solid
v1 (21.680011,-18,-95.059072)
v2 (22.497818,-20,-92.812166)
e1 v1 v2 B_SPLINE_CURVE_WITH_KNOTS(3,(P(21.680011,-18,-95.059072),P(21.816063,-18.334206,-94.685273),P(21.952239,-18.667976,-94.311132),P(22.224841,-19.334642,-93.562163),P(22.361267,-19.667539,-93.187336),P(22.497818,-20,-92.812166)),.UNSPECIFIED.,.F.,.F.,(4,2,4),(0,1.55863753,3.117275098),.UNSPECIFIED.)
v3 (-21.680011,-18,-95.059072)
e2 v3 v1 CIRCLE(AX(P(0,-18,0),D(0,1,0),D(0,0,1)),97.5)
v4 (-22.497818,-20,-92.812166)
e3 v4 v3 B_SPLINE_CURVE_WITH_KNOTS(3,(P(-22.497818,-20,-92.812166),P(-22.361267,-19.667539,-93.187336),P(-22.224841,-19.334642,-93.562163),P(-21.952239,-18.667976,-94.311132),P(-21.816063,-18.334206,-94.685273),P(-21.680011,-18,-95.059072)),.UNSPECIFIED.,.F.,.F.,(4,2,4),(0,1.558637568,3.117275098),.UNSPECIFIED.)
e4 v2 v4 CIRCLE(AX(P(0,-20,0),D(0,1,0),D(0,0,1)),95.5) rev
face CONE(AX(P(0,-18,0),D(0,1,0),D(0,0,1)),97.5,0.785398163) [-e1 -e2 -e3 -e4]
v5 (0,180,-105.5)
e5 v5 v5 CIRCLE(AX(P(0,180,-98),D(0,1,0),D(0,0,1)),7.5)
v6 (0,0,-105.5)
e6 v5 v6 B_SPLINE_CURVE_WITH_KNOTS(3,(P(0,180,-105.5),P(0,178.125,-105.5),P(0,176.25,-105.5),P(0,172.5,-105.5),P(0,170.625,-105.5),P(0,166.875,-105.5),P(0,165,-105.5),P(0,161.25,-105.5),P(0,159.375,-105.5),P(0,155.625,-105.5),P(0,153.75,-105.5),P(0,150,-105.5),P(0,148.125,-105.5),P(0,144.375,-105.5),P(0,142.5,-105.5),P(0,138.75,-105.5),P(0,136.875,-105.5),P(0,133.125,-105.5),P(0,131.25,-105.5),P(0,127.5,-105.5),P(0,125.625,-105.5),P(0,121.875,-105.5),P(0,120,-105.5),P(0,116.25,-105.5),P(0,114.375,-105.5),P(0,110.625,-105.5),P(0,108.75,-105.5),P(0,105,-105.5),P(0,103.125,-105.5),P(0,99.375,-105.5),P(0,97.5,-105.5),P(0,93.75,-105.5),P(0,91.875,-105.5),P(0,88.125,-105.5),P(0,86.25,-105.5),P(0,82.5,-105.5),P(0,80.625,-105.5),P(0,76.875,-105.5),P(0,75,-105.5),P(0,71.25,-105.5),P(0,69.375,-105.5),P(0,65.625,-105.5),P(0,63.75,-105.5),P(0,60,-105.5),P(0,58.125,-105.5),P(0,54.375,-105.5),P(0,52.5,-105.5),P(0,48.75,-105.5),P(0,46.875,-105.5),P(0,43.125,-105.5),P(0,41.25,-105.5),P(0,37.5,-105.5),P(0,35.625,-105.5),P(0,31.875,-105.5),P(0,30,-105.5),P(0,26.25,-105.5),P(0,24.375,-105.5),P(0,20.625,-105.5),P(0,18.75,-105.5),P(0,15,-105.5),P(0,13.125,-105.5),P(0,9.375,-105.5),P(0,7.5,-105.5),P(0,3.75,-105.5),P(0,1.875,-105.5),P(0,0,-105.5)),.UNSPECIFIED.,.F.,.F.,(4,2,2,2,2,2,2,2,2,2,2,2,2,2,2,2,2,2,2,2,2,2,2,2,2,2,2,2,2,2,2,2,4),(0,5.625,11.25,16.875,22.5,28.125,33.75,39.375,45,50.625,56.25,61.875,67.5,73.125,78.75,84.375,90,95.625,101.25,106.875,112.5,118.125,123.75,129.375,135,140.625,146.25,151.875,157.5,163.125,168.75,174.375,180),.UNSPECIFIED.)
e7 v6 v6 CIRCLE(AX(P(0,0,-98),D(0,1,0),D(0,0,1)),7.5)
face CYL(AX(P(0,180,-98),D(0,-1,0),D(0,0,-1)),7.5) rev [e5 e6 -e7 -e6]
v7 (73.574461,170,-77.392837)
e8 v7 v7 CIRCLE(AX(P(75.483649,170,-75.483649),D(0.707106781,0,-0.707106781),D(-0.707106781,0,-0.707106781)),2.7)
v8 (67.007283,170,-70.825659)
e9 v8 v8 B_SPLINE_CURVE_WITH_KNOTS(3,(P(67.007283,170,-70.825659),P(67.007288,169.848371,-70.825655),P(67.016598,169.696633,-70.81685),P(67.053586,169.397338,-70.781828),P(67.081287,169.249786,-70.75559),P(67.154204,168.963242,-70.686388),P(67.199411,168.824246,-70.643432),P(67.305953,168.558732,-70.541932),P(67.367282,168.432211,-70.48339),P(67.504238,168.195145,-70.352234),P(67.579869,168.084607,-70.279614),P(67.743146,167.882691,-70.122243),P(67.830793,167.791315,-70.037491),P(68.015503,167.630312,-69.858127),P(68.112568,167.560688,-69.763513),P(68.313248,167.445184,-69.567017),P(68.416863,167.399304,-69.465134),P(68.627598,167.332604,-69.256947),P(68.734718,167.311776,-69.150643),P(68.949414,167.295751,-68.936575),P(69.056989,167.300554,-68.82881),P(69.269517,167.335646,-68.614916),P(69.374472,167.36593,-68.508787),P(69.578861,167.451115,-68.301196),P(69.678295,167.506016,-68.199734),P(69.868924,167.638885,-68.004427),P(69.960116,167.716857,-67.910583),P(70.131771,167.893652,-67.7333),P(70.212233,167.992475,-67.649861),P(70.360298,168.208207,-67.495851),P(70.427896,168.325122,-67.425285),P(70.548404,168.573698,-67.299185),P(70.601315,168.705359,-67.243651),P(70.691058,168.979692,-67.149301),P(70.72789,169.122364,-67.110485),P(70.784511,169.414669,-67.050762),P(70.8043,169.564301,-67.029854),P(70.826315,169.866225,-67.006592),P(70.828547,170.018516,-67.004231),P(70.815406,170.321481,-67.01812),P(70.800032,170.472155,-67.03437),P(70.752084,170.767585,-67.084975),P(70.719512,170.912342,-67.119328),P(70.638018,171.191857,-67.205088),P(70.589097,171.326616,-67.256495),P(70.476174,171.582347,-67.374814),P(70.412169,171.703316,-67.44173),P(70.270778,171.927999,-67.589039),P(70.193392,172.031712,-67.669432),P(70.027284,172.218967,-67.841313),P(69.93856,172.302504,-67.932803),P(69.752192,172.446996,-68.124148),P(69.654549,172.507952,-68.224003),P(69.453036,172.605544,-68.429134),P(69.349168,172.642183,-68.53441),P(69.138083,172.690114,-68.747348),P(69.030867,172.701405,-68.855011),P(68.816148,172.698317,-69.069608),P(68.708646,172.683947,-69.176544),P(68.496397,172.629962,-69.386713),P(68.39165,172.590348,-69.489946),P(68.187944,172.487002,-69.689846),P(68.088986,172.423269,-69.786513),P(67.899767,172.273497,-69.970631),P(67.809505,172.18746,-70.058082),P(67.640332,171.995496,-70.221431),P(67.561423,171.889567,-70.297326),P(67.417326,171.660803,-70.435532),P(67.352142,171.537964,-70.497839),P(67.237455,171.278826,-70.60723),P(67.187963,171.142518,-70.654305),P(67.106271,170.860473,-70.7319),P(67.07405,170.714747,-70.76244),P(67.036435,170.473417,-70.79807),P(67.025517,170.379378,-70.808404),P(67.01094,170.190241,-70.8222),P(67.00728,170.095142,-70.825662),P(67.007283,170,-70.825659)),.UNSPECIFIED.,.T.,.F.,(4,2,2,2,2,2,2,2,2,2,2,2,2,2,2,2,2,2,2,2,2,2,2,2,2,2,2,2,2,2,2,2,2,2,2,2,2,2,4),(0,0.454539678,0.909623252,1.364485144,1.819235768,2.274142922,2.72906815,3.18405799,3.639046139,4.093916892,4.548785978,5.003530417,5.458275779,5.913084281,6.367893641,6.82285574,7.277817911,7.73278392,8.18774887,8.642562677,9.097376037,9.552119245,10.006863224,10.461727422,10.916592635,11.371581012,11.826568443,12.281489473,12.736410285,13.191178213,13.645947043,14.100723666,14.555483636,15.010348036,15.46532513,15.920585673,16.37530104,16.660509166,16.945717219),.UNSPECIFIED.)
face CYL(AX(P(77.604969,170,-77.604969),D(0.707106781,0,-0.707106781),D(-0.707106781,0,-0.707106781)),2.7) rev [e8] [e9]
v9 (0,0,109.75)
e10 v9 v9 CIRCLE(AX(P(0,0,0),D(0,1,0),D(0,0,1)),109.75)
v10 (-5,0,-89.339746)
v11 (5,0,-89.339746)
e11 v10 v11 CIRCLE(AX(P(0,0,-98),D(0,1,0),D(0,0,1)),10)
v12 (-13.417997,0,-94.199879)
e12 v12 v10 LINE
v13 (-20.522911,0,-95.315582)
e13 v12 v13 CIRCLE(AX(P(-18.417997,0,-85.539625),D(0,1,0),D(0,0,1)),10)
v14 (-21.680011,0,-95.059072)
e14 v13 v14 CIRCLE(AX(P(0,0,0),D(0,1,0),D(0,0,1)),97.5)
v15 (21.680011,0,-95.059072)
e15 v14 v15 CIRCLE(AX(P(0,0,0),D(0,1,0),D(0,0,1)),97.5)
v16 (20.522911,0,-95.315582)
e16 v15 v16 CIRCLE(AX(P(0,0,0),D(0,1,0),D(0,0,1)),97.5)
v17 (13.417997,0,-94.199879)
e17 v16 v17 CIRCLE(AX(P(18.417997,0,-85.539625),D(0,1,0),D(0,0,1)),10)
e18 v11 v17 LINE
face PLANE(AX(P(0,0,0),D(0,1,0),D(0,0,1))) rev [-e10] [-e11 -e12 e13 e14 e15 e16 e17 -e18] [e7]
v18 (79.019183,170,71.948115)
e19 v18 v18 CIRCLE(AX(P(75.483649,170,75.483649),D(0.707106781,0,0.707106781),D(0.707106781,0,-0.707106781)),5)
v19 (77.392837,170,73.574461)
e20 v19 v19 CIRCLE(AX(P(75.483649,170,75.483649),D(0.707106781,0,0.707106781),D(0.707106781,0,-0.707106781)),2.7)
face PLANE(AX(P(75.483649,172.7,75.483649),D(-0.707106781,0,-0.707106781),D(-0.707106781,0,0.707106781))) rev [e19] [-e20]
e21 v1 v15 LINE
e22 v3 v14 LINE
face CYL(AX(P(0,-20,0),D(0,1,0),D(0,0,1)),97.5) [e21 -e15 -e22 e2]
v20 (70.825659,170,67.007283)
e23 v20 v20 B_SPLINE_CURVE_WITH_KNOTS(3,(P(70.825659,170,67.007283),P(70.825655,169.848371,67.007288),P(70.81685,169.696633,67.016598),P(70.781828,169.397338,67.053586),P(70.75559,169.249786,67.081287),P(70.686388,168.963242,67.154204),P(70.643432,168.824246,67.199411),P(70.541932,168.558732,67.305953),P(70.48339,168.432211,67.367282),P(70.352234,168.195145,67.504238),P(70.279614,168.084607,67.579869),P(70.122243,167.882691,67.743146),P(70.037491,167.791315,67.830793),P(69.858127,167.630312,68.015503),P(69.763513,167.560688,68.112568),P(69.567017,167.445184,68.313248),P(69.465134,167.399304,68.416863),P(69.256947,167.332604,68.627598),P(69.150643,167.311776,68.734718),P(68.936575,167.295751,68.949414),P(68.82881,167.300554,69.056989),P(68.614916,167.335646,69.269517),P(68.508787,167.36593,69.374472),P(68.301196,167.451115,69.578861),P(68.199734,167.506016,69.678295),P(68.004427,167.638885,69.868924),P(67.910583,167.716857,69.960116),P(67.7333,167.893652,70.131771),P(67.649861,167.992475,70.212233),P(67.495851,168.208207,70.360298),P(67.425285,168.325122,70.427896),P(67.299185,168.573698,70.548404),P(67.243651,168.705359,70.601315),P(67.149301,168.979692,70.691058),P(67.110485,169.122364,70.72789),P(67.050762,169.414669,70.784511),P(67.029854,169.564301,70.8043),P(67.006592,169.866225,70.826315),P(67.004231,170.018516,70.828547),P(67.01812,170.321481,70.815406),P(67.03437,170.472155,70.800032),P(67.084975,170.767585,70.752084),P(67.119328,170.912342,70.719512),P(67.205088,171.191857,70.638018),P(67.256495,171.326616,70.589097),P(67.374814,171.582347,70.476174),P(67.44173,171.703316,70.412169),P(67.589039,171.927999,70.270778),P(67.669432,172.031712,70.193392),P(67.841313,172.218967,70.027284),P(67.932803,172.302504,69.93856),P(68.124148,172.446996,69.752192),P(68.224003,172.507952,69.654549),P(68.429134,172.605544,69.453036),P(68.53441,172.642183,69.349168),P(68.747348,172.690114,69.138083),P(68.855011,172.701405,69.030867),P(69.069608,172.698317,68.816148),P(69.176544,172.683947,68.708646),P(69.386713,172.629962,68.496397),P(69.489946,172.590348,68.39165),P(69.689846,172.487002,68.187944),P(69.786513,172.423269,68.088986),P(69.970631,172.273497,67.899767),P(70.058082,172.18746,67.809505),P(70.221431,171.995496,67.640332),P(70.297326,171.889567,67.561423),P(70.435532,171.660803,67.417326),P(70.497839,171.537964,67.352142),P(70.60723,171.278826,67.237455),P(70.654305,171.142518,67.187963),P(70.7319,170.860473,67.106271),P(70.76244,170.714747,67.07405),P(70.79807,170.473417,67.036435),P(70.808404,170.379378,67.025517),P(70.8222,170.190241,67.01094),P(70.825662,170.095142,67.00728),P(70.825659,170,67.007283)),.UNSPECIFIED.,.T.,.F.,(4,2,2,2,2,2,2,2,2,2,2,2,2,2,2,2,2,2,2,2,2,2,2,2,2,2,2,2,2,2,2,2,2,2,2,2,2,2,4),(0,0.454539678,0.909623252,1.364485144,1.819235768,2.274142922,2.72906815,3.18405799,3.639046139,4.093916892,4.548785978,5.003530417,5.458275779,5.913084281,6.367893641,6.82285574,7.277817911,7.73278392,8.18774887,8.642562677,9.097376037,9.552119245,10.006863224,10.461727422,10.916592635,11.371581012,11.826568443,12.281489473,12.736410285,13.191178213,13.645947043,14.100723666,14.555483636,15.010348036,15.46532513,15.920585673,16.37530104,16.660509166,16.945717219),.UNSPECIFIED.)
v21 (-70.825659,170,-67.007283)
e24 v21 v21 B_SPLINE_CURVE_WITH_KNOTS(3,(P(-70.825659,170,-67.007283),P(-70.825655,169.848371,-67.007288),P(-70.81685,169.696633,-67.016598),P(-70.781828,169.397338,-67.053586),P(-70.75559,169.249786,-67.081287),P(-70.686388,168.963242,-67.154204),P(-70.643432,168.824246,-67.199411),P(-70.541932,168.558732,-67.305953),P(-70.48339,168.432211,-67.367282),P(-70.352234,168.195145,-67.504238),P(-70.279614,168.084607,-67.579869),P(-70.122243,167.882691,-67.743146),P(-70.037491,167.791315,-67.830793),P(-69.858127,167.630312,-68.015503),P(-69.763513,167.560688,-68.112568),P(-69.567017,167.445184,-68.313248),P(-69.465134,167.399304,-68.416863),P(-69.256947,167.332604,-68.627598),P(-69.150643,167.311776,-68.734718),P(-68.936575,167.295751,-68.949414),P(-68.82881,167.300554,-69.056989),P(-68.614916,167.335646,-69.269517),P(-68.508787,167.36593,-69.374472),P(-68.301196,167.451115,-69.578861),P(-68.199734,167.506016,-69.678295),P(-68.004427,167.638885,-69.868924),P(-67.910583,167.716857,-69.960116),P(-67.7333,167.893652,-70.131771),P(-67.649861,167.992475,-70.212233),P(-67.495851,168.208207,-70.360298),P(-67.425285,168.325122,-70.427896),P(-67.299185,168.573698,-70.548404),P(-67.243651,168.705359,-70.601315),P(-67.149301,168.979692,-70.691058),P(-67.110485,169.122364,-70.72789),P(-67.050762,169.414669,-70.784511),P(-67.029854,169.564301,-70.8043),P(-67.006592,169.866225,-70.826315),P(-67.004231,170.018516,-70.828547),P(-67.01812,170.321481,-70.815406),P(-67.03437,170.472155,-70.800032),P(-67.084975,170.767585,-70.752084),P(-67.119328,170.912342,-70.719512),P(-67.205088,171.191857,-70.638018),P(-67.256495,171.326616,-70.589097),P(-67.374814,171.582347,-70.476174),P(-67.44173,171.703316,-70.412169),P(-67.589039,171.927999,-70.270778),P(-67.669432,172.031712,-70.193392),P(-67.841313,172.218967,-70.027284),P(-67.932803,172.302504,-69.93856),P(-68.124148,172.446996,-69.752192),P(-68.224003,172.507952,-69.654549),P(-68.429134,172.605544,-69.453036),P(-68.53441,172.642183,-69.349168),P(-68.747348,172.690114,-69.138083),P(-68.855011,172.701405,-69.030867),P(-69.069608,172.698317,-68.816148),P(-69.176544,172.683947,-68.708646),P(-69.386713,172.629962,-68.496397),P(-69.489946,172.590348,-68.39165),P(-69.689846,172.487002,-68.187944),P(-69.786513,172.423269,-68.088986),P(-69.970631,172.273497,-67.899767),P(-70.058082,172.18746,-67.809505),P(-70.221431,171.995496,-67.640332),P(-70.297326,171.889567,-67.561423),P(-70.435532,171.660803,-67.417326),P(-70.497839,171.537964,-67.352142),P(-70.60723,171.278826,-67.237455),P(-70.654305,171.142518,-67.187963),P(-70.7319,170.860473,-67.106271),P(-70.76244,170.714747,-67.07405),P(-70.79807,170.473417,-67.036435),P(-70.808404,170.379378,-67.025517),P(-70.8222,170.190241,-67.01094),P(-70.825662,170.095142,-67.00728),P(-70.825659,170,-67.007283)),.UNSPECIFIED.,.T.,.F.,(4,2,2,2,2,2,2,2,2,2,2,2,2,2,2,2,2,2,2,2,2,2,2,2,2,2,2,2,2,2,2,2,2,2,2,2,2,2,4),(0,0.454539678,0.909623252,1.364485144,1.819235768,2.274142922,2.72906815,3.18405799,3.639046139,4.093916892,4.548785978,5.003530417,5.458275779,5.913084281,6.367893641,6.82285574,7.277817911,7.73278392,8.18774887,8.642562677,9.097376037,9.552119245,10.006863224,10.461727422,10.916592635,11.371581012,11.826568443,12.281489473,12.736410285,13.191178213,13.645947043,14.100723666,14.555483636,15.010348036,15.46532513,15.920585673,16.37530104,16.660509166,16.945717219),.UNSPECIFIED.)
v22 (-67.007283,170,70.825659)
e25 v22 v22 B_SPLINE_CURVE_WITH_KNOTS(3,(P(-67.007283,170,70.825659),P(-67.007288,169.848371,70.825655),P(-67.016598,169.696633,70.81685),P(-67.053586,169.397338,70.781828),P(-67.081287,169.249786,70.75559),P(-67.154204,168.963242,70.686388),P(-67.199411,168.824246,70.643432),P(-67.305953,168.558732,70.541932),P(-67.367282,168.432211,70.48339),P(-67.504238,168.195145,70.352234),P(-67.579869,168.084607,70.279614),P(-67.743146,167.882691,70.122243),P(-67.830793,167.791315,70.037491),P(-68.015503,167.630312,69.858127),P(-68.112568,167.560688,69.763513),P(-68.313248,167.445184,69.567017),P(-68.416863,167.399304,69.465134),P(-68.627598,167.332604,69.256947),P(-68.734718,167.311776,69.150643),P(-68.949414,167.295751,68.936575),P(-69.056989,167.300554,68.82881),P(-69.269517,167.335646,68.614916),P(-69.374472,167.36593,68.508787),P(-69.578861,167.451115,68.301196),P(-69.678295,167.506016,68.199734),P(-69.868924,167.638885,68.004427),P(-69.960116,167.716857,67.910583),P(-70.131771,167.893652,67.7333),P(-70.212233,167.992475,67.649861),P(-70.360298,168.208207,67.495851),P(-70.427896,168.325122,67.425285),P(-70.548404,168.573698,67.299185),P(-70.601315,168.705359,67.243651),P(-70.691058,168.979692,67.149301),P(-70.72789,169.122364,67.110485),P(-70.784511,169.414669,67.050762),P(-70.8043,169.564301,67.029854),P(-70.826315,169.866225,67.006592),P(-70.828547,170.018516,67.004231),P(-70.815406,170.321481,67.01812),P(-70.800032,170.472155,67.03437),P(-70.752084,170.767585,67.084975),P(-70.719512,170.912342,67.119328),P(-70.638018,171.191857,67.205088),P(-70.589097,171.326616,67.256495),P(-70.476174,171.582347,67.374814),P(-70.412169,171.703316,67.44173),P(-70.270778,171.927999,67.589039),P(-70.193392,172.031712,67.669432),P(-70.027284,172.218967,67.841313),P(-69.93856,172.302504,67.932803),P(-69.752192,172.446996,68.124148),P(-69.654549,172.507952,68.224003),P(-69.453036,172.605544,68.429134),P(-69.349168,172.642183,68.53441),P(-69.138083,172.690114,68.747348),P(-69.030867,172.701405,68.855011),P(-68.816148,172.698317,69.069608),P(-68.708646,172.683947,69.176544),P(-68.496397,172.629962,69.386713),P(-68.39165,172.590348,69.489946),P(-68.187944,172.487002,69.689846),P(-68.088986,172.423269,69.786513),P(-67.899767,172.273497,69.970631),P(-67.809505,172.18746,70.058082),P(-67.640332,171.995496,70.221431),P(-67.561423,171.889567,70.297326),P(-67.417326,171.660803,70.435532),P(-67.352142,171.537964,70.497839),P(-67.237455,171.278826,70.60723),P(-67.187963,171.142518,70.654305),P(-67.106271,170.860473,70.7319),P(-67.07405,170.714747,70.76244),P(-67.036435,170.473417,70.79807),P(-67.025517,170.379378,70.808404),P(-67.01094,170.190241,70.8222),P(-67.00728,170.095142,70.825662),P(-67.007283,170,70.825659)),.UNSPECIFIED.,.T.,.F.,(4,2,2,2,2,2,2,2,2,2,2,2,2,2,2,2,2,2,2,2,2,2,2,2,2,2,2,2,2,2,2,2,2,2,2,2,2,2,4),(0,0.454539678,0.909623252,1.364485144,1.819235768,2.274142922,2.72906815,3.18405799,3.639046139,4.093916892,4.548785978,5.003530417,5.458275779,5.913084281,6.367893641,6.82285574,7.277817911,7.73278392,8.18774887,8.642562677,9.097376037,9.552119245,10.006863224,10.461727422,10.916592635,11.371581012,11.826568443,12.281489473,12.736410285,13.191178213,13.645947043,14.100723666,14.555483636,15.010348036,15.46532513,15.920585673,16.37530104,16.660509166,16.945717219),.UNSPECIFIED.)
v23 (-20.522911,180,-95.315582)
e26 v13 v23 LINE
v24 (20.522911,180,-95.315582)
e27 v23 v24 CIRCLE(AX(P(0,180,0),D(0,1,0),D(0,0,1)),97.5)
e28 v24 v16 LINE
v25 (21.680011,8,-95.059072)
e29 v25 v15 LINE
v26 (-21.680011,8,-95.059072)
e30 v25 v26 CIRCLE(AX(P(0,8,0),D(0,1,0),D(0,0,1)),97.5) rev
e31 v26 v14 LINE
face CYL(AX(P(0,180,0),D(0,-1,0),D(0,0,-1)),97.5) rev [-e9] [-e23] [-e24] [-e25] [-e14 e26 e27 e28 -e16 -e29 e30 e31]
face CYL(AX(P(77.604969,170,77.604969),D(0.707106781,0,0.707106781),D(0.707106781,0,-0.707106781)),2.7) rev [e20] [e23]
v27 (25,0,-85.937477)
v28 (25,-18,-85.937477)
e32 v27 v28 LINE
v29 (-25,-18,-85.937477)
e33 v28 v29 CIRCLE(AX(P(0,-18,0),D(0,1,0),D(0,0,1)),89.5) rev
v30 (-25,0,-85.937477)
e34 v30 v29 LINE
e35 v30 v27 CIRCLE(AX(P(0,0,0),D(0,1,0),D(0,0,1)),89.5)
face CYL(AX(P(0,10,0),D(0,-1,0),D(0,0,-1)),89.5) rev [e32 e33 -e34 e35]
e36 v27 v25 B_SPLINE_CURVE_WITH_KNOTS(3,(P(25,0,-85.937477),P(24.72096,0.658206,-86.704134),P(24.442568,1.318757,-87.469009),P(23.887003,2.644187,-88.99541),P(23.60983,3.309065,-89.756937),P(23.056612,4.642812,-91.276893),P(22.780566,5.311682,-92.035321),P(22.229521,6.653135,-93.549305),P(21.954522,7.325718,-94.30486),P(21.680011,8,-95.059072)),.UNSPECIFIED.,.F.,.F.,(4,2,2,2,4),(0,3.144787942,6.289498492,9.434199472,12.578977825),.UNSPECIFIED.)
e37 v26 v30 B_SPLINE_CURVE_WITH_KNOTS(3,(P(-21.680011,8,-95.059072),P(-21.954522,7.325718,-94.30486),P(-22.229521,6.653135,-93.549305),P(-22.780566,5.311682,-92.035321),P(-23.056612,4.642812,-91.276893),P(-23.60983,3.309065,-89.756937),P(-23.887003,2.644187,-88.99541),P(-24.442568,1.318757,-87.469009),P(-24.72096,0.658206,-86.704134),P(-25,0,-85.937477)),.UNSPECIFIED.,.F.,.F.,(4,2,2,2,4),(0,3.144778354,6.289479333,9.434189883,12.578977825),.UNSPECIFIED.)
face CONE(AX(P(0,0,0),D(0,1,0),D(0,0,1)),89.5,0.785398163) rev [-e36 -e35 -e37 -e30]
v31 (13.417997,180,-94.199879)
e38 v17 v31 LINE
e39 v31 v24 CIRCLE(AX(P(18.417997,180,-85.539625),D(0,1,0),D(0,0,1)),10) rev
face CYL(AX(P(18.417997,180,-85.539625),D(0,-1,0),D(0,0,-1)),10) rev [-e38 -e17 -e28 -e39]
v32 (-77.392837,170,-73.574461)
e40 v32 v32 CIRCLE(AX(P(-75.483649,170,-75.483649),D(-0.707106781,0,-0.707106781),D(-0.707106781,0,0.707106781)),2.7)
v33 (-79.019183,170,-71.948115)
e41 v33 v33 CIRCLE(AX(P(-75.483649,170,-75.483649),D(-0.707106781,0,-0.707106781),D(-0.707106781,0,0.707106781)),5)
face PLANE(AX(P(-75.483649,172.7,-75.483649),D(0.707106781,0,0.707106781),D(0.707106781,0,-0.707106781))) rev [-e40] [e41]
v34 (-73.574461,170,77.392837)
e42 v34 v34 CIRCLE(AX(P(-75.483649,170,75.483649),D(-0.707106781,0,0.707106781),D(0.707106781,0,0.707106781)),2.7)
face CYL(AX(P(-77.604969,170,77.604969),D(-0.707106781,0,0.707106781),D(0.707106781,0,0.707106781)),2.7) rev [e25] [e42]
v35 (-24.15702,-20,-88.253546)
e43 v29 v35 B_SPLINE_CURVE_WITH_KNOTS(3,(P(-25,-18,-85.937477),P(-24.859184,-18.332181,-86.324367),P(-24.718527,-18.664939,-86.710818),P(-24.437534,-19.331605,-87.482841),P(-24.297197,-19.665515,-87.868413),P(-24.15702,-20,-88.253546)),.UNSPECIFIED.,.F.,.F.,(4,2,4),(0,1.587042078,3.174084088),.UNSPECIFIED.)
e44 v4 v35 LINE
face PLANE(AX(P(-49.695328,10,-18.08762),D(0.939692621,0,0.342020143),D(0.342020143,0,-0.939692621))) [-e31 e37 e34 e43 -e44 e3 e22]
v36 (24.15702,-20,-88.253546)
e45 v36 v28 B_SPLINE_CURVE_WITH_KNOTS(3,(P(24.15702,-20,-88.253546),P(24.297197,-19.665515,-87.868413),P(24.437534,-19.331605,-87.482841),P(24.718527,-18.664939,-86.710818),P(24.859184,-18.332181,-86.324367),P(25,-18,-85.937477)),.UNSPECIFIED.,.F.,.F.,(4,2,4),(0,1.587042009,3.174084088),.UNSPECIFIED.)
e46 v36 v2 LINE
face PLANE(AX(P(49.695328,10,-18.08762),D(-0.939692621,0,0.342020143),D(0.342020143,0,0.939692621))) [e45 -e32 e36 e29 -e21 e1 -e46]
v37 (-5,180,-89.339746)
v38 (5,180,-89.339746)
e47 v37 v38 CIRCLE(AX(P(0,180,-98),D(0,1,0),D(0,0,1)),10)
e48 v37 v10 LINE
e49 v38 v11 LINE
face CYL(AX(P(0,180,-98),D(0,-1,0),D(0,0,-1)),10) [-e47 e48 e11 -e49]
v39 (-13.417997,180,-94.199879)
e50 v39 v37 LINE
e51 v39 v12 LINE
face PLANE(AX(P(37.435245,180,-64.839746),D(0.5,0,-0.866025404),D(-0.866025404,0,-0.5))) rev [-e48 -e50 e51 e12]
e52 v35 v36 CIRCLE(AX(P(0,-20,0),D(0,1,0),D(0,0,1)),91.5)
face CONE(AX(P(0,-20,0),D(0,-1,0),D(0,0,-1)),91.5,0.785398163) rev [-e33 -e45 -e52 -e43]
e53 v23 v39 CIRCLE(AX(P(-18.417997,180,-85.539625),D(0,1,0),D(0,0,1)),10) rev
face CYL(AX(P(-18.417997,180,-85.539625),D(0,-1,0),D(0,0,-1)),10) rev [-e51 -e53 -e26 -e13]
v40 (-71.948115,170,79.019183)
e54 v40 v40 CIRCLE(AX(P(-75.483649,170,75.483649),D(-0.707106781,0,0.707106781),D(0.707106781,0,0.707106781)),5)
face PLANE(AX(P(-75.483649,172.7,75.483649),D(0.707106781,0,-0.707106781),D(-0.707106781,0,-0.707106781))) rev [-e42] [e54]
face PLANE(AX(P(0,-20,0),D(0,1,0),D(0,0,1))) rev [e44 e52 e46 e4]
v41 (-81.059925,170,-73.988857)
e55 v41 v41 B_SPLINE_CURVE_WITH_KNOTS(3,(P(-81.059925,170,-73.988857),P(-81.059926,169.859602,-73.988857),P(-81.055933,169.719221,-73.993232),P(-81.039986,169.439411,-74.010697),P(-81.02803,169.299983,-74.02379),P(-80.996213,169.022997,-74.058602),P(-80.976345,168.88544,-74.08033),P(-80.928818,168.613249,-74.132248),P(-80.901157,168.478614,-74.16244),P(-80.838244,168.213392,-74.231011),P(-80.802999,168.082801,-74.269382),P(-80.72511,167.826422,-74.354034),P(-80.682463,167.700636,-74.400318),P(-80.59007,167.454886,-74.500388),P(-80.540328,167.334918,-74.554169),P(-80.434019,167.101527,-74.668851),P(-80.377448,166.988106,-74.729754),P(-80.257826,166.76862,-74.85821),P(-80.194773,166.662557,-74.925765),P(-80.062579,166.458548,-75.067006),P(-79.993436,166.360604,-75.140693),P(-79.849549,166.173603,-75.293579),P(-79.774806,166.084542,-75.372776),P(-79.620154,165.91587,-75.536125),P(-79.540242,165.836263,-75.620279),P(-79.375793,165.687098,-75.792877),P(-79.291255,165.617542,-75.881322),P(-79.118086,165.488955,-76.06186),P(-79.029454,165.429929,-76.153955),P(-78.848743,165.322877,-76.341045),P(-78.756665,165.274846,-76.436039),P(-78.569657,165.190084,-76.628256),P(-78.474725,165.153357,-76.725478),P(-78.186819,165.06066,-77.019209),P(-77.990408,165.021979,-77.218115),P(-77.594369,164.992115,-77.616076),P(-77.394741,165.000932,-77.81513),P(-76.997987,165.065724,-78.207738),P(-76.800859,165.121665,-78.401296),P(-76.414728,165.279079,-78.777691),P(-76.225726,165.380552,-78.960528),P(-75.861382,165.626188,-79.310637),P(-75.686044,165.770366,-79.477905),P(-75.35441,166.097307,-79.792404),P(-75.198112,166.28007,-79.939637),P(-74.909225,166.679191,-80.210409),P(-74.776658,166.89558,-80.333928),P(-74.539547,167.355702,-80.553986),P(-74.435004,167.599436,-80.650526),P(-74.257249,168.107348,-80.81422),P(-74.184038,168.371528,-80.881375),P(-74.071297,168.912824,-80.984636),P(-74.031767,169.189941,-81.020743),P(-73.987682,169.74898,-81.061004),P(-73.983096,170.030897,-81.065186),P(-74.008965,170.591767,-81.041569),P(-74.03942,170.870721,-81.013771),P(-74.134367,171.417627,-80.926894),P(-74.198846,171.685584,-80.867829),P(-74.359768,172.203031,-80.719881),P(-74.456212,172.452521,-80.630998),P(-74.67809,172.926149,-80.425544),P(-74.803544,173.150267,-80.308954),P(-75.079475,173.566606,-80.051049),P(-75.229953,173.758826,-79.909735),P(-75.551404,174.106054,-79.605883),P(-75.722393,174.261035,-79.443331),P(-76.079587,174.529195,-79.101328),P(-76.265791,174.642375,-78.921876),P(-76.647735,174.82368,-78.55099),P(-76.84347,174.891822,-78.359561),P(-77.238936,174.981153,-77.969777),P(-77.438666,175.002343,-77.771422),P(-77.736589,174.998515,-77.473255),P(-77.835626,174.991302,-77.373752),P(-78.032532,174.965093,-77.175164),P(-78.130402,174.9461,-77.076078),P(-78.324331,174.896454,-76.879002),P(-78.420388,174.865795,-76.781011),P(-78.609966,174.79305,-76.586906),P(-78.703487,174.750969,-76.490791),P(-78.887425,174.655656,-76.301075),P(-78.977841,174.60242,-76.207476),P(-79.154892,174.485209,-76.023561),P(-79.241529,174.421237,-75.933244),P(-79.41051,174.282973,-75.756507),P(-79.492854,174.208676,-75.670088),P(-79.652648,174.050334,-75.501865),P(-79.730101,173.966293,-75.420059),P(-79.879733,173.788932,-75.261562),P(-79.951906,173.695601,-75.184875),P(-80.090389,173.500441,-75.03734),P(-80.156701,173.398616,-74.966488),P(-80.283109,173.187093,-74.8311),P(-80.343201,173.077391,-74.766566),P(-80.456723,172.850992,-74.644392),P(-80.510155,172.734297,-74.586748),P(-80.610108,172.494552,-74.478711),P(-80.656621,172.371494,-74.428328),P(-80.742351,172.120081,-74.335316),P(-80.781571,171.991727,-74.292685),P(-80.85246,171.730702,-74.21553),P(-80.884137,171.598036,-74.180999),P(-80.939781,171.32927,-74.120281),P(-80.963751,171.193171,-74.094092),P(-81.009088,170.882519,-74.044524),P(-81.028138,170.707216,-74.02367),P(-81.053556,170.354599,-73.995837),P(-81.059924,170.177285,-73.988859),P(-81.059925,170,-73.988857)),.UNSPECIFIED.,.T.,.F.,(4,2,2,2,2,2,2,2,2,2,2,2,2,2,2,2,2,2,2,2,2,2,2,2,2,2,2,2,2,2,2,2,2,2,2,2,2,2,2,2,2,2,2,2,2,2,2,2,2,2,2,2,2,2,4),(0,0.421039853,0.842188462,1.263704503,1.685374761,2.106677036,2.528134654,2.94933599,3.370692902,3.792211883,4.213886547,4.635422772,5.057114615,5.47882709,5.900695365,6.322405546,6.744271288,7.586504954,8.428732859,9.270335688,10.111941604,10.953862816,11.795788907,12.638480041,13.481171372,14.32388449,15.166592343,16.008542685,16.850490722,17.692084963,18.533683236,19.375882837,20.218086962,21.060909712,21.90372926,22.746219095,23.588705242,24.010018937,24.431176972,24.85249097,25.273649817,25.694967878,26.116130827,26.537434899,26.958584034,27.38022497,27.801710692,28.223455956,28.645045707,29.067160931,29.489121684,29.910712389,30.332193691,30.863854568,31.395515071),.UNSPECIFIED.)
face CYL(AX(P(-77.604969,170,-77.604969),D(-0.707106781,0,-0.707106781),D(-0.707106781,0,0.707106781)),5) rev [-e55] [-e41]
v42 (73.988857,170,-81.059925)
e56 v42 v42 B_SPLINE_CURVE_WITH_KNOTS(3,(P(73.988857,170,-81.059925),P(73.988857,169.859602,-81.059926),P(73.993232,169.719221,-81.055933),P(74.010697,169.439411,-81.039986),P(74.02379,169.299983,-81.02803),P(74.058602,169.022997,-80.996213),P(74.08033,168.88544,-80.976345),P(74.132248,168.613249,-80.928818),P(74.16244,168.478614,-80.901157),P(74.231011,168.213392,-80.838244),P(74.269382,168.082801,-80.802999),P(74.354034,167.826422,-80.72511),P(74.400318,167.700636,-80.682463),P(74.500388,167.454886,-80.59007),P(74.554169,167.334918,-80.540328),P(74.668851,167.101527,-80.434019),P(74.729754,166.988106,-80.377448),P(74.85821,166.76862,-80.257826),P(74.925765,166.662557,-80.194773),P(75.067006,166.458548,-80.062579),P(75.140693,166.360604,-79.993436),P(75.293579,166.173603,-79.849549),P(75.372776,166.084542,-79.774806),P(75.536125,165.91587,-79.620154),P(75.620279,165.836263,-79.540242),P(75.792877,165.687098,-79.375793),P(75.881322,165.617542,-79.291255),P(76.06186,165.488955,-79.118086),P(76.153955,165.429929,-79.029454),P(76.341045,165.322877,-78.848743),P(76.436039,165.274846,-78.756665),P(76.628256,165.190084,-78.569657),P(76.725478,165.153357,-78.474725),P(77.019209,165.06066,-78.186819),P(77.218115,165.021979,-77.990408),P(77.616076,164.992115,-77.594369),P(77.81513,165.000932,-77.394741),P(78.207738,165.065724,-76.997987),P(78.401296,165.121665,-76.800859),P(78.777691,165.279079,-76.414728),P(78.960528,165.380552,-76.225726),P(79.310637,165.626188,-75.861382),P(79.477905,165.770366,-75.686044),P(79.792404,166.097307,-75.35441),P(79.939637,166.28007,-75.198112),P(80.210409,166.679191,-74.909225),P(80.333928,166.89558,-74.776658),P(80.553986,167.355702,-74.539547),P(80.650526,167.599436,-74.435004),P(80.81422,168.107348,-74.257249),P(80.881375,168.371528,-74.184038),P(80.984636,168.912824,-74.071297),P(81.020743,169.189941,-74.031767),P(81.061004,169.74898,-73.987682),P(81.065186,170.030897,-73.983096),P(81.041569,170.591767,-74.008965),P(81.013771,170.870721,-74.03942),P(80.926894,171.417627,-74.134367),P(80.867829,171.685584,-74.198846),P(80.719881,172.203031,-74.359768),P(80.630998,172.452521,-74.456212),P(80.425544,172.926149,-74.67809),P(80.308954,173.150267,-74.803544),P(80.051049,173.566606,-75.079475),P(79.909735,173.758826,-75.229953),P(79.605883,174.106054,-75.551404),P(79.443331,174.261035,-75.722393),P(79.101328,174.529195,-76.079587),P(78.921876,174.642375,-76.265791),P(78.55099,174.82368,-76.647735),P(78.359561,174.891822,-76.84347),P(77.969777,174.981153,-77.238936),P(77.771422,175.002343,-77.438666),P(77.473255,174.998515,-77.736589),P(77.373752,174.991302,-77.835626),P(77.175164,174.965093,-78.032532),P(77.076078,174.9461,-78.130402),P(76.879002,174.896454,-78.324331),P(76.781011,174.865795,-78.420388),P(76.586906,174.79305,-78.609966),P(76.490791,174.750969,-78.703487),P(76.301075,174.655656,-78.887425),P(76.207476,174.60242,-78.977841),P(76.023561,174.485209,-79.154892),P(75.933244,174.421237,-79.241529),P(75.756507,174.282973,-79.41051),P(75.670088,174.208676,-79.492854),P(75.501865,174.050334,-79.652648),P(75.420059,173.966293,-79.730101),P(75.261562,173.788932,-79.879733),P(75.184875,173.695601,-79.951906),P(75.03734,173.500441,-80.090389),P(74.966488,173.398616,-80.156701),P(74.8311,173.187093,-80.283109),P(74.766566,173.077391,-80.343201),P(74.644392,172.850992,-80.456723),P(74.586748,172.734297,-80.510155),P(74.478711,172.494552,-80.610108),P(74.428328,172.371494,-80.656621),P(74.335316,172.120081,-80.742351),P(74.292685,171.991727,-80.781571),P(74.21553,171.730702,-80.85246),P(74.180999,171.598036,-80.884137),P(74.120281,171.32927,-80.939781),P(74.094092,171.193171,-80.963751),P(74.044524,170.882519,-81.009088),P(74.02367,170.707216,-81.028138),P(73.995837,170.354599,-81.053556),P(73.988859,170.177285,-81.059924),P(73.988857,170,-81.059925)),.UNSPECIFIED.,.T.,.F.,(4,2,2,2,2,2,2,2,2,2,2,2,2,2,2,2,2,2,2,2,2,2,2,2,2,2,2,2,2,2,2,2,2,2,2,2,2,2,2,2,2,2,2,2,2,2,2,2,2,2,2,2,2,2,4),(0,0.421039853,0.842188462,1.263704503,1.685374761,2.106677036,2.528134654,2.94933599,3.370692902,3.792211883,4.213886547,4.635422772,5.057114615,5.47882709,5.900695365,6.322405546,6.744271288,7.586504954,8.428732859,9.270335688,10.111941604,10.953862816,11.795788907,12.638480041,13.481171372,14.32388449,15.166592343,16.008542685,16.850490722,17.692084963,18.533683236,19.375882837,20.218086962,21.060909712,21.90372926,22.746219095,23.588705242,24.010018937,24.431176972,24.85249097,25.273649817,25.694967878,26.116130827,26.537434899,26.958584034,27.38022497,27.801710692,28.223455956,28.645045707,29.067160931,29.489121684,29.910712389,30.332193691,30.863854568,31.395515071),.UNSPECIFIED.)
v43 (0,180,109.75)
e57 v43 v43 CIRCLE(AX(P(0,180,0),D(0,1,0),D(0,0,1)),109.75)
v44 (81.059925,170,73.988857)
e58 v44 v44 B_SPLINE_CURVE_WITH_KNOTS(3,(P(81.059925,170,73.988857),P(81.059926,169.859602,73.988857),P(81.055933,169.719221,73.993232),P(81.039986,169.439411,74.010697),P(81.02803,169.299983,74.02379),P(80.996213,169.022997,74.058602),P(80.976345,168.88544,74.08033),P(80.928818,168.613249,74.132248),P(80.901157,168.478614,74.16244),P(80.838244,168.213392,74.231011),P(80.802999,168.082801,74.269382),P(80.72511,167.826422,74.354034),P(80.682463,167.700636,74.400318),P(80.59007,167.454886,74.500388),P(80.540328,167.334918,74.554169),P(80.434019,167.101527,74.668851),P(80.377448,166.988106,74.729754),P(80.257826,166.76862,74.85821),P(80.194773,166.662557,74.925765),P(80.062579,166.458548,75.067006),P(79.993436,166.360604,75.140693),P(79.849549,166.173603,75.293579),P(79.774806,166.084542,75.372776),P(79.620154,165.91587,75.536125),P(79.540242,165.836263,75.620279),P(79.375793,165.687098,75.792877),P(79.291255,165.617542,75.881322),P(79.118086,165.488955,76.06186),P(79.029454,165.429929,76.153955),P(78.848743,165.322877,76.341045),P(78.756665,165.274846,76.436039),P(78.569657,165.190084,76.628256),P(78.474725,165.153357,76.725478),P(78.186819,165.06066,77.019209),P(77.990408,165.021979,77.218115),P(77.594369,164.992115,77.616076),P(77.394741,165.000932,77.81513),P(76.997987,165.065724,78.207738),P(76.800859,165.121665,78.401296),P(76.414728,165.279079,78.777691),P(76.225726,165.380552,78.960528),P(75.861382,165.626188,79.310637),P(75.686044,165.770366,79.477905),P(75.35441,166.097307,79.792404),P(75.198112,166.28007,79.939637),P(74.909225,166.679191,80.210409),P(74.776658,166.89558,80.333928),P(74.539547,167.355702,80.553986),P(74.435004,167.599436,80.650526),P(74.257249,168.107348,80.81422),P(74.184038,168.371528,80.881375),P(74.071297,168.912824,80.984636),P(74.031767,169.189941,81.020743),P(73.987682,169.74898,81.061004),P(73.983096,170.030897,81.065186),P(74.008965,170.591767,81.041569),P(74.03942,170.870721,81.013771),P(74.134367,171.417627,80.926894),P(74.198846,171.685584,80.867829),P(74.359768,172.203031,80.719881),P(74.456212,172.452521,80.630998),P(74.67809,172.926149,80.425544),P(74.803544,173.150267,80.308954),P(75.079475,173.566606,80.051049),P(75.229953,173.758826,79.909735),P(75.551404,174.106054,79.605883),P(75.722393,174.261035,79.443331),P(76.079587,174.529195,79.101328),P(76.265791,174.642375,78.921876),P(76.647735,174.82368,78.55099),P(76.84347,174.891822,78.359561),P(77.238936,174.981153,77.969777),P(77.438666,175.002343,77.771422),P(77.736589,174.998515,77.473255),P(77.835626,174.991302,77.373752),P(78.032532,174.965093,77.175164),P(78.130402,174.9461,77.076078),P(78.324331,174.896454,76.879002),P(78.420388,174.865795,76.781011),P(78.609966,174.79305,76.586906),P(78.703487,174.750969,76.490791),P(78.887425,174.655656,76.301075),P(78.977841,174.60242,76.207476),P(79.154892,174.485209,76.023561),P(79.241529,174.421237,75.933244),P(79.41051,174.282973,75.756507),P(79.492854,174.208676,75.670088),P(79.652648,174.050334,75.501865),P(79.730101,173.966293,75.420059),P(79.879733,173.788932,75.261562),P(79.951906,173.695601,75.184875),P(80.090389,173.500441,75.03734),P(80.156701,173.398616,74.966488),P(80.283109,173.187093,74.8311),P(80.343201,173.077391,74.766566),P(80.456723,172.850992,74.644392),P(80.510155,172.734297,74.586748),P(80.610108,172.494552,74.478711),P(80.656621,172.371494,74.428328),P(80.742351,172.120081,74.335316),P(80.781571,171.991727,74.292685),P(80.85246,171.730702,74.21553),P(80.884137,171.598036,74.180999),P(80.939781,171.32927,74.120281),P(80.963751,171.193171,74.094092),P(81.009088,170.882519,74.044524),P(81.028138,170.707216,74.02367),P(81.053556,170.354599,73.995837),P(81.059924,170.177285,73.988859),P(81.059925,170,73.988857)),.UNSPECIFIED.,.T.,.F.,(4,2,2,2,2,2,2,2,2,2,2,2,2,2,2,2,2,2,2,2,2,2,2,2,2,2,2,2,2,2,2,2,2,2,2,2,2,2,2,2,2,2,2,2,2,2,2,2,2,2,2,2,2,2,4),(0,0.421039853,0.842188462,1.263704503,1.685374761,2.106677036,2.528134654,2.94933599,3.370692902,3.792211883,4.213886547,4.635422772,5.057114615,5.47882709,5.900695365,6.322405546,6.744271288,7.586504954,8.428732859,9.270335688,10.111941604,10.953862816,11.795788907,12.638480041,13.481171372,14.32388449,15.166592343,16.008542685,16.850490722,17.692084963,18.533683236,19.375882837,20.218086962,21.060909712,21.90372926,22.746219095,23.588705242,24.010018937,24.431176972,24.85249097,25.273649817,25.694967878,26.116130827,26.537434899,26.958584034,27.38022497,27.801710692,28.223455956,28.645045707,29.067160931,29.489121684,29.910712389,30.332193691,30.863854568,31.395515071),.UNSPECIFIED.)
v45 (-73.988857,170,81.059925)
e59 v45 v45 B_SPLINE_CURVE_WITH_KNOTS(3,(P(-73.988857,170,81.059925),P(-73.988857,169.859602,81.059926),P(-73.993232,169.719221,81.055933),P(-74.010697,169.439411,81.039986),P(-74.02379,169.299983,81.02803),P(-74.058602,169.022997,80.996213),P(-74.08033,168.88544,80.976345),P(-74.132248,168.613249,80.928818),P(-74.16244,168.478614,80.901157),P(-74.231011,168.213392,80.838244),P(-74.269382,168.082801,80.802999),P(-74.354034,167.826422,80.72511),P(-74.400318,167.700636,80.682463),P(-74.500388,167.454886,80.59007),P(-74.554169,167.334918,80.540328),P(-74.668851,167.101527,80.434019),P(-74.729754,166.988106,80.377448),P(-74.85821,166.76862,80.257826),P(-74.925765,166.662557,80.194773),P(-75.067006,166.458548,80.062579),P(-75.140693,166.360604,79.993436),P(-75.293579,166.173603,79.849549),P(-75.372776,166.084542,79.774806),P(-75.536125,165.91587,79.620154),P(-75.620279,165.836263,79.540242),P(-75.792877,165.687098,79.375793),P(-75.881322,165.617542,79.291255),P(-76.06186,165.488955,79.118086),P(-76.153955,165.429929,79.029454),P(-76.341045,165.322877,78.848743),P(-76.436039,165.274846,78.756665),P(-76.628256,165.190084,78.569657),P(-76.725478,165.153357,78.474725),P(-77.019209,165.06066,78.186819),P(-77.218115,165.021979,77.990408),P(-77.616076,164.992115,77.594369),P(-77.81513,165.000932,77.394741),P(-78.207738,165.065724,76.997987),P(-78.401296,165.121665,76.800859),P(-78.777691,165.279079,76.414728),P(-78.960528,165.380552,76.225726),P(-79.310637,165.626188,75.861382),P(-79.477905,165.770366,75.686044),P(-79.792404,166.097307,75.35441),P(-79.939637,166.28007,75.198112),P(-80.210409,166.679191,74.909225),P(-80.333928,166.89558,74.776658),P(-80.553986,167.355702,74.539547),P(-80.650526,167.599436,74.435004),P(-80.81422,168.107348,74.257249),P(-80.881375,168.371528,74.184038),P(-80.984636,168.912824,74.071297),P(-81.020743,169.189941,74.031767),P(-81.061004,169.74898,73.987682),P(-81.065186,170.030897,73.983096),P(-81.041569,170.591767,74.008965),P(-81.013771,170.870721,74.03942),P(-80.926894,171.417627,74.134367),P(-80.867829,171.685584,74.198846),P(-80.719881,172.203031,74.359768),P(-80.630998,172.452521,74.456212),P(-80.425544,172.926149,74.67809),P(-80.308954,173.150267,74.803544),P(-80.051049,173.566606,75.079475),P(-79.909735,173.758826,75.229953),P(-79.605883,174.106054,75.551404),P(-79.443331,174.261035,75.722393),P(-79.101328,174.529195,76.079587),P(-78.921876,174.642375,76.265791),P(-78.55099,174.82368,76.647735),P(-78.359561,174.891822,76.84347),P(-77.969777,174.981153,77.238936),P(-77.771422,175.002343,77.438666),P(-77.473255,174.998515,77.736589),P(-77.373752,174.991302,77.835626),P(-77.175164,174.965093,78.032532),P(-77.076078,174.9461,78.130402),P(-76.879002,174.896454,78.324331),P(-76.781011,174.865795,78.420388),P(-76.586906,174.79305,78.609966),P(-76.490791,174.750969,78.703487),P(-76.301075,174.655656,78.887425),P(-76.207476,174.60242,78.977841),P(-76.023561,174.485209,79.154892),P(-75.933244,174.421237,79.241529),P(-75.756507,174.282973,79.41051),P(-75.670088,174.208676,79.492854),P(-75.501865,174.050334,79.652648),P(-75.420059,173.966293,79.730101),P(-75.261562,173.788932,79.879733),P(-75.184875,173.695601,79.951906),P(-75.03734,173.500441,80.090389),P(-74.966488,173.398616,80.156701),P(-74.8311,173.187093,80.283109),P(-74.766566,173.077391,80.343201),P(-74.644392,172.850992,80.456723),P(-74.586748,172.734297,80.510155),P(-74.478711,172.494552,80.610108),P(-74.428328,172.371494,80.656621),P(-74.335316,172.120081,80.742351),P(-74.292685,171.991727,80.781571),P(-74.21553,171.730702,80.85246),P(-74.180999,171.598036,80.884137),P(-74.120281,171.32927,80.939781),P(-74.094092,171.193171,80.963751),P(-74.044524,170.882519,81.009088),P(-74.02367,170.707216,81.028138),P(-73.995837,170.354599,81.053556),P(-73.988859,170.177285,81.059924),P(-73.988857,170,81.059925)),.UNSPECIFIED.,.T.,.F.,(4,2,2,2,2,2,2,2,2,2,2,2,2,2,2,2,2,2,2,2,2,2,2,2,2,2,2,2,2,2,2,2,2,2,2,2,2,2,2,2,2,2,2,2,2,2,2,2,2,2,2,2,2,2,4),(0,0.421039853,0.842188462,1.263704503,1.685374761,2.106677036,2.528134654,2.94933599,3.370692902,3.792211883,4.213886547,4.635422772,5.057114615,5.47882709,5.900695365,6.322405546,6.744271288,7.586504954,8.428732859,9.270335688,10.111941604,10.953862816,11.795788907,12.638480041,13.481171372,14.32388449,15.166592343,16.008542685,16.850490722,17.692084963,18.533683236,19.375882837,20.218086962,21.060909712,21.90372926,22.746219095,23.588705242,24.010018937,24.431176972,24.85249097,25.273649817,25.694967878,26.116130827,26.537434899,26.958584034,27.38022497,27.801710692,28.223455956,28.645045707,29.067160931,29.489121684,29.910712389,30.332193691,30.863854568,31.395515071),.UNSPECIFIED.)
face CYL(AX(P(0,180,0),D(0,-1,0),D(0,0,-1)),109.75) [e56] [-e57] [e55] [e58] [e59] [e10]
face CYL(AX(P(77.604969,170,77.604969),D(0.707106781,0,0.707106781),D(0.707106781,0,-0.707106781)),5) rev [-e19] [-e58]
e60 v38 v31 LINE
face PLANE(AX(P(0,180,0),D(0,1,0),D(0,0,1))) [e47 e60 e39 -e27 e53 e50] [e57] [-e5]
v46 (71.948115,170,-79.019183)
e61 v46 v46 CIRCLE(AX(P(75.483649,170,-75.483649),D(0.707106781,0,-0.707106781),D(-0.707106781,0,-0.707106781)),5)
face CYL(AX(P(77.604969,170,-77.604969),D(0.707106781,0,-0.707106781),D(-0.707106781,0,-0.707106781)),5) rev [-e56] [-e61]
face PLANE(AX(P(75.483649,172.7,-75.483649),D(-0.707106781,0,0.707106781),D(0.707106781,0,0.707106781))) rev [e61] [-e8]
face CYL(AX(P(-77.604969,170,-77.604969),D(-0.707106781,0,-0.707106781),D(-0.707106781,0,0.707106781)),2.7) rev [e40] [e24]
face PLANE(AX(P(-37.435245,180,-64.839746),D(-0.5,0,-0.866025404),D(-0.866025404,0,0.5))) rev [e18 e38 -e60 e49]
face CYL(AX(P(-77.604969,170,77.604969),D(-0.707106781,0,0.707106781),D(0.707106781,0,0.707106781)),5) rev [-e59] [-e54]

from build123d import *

# Parameters (mm, degrees)
SCHIZZO1_R                                           = 109.75
SCHIZZO1_R_2                                         = 7.5
ESTRUSIONE_ESTRUSIONE1_DEPTH                         = 180
FORO_LAMATO_PER_BULLONE_M5_A_TESTA_ESAGO_D           = 5.4
FORO_LAMATO_PER_BULLONE_M5_A_TESTA_ESAGO_DEPTH       = 20
FORO_LAMATO_PER_BULLONE_M5_A_TESTA_ESAGO_CBORE_D     = 10
FORO_LAMATO_PER_BULLONE_M5_A_TESTA_ESAGO_CBORE_DEPTH = 3
FORO_LAMATO_PER_BULLONE_M5_A_TESTA_ESAGO_TIP         = 1.622323671
FORO_LAMATO_PER_BULLONE_M5_A_TESTA_E_2_D             = 5.4
FORO_LAMATO_PER_BULLONE_M5_A_TESTA_E_2_DEPTH         = 20
FORO_LAMATO_PER_BULLONE_M5_A_TESTA_E_2_CBORE_D       = 10
FORO_LAMATO_PER_BULLONE_M5_A_TESTA_E_2_CBORE_DEPTH   = 3
FORO_LAMATO_PER_BULLONE_M5_A_TESTA_E_2_TIP           = 1.622323671
FORO_LAMATO_PER_BULLONE_M5_A_TESTA_E_3_D             = 5.4
FORO_LAMATO_PER_BULLONE_M5_A_TESTA_E_3_DEPTH         = 20
FORO_LAMATO_PER_BULLONE_M5_A_TESTA_E_3_CBORE_D       = 10
FORO_LAMATO_PER_BULLONE_M5_A_TESTA_E_3_CBORE_DEPTH   = 3
FORO_LAMATO_PER_BULLONE_M5_A_TESTA_E_3_TIP           = 1.622323671
FORO_LAMATO_PER_BULLONE_M5_A_TESTA_E_4_D             = 5.4
FORO_LAMATO_PER_BULLONE_M5_A_TESTA_E_4_DEPTH         = 20
FORO_LAMATO_PER_BULLONE_M5_A_TESTA_E_4_CBORE_D       = 10
FORO_LAMATO_PER_BULLONE_M5_A_TESTA_E_4_CBORE_DEPTH   = 3
FORO_LAMATO_PER_BULLONE_M5_A_TESTA_E_4_TIP           = 1.622323671
ESTRUSIONE_ESTRUSIONE2_DEPTH                         = 20
ESTRUSIONE_ESTRUSIONE3_DEPTH                         = 10
SMUSSO1_SIZE                                         = 10
RACCORDO1_R                                          = 10
SMUSSO2_SIZE                                         = 2


with BuildPart() as part:
    # Schizzo1 → Estrusione-Estrusione1 (new body)
    with BuildSketch(Plane(origin=(0, 0, 0), x_dir=(1, 0, 0), z_dir=(0, 1, 0))):
        with Locations(Location((0, 0, 0), (0, 0, 90))):
            Circle(SCHIZZO1_R)
        with Locations(Location((0, 98, 0), (0, 0, 90))):
            Circle(SCHIZZO1_R_2, mode=Mode.SUBTRACT)
        with BuildLine():
            Line((-16.652598983, 96.067377122), (-5, 89.339745962))
            ThreePointArc((-5, 89.339745962), (0, 88), (5, 89.339745962))
            Line((5, 89.339745962), (16.652598983, 96.067377122))
            ThreePointArc((16.652598983, 96.067377122), (0, -97.5), (-16.652598983, 96.067377122))
        make_face(mode=Mode.SUBTRACT)
    extrude(amount=ESTRUSIONE_ESTRUSIONE1_DEPTH)

    # Foro lamato per Bullone M5 a testa esagonale-1
    with Locations(Plane(origin=(-77.604969235, 170, -77.604969235), x_dir=(-0.707106781187, 0, 0.707106781187), z_dir=(-0.707106781187, 0, -0.707106781187))):
        with Locations((0, 0)):
            CounterBoreHole(FORO_LAMATO_PER_BULLONE_M5_A_TESTA_ESAGO_D / 2, FORO_LAMATO_PER_BULLONE_M5_A_TESTA_ESAGO_CBORE_D / 2, FORO_LAMATO_PER_BULLONE_M5_A_TESTA_ESAGO_CBORE_DEPTH, depth=FORO_LAMATO_PER_BULLONE_M5_A_TESTA_ESAGO_DEPTH)
            with Locations((0, 0, -(FORO_LAMATO_PER_BULLONE_M5_A_TESTA_ESAGO_DEPTH + FORO_LAMATO_PER_BULLONE_M5_A_TESTA_ESAGO_TIP / 2))):  # 118° drill point
                Cone(0, FORO_LAMATO_PER_BULLONE_M5_A_TESTA_ESAGO_D / 2, FORO_LAMATO_PER_BULLONE_M5_A_TESTA_ESAGO_TIP, mode=Mode.SUBTRACT)

    # Foro lamato per Bullone M5 a testa e 2
    with Locations(Plane(origin=(-77.604969235, 170, 77.604969235), x_dir=(0.707106781187, 0, 0.707106781187), z_dir=(-0.707106781187, 0, 0.707106781187))):
        with Locations((0, 0)):
            CounterBoreHole(FORO_LAMATO_PER_BULLONE_M5_A_TESTA_E_2_D / 2, FORO_LAMATO_PER_BULLONE_M5_A_TESTA_E_2_CBORE_D / 2, FORO_LAMATO_PER_BULLONE_M5_A_TESTA_E_2_CBORE_DEPTH, depth=FORO_LAMATO_PER_BULLONE_M5_A_TESTA_E_2_DEPTH)
            with Locations((0, 0, -(FORO_LAMATO_PER_BULLONE_M5_A_TESTA_E_2_DEPTH + FORO_LAMATO_PER_BULLONE_M5_A_TESTA_E_2_TIP / 2))):  # 118° drill point
                Cone(0, FORO_LAMATO_PER_BULLONE_M5_A_TESTA_E_2_D / 2, FORO_LAMATO_PER_BULLONE_M5_A_TESTA_E_2_TIP, mode=Mode.SUBTRACT)

    # Foro lamato per Bullone M5 a testa e 3
    with Locations(Plane(origin=(77.604969235, 170, -77.604969235), x_dir=(-0.707106781187, 0, -0.707106781187), z_dir=(0.707106781187, 0, -0.707106781187))):
        with Locations((0, 0)):
            CounterBoreHole(FORO_LAMATO_PER_BULLONE_M5_A_TESTA_E_3_D / 2, FORO_LAMATO_PER_BULLONE_M5_A_TESTA_E_3_CBORE_D / 2, FORO_LAMATO_PER_BULLONE_M5_A_TESTA_E_3_CBORE_DEPTH, depth=FORO_LAMATO_PER_BULLONE_M5_A_TESTA_E_3_DEPTH)
            with Locations((0, 0, -(FORO_LAMATO_PER_BULLONE_M5_A_TESTA_E_3_DEPTH + FORO_LAMATO_PER_BULLONE_M5_A_TESTA_E_3_TIP / 2))):  # 118° drill point
                Cone(0, FORO_LAMATO_PER_BULLONE_M5_A_TESTA_E_3_D / 2, FORO_LAMATO_PER_BULLONE_M5_A_TESTA_E_3_TIP, mode=Mode.SUBTRACT)

    # Foro lamato per Bullone M5 a testa e 4
    with Locations(Plane(origin=(77.604969235, 170, 77.604969235), x_dir=(0.707106781187, 0, -0.707106781187), z_dir=(0.707106781187, 0, 0.707106781187))):
        with Locations((0, 0)):
            CounterBoreHole(FORO_LAMATO_PER_BULLONE_M5_A_TESTA_E_4_D / 2, FORO_LAMATO_PER_BULLONE_M5_A_TESTA_E_4_CBORE_D / 2, FORO_LAMATO_PER_BULLONE_M5_A_TESTA_E_4_CBORE_DEPTH, depth=FORO_LAMATO_PER_BULLONE_M5_A_TESTA_E_4_DEPTH)
            with Locations((0, 0, -(FORO_LAMATO_PER_BULLONE_M5_A_TESTA_E_4_DEPTH + FORO_LAMATO_PER_BULLONE_M5_A_TESTA_E_4_TIP / 2))):  # 118° drill point
                Cone(0, FORO_LAMATO_PER_BULLONE_M5_A_TESTA_E_4_D / 2, FORO_LAMATO_PER_BULLONE_M5_A_TESTA_E_4_TIP, mode=Mode.SUBTRACT)



with BuildPart() as body_2:
    # Schizzo1<4> → Estrusione-Estrusione2 (new body)
    with BuildSketch(Plane(origin=(0, 0, 0), x_dir=(1, 0, 0), z_dir=(0, 1, 0))):
        with BuildLine():
            Line((-25, 85.937477273), (-21.68001113, 95.059071726))
            ThreePointArc((-21.68001113, 95.059071726), (0, -97.5), (21.68001113, 95.059071726))
            Line((21.68001113, 95.059071726), (25, 85.937477273))
            ThreePointArc((25, 85.937477273), (0, -89.5), (-25, 85.937477273))
        make_face()
    extrude(amount=-ESTRUSIONE_ESTRUSIONE2_DEPTH)


with BuildPart() as part_1:
    add(part.part)

    add(body_2.part)  # Estrusione-Estrusione3 merges body 2
    # Schizzo1<5> → Estrusione-Estrusione3 (add)
    with BuildSketch(Plane(origin=(0, 0, 0), x_dir=(1, 0, 0), z_dir=(0, 1, 0))):
        with BuildLine():
            Line((-25, 85.937477273), (-21.68001113, 95.059071726))
            ThreePointArc((-21.68001113, 95.059071726), (0, -97.5), (21.68001113, 95.059071726))
            Line((21.68001113, 95.059071726), (25, 85.937477273))
            ThreePointArc((25, 85.937477273), (0, -89.5), (-25, 85.937477273))
        make_face()
    extrude(amount=ESTRUSIONE_ESTRUSIONE3_DEPTH)

    # Smusso1
    # the kernel refuses this chamfer: 10 mm, written as the material it takes off along each edge
    with BuildSketch(Plane(origin=(0, 10, 0), x_dir=(0.0031415874858797023, 0, -0.9999950652018582), z_dir=(-0.9999950652018582, 0, -0.0031415874858797023))) as smusso1_piece_1_section:
        Polygon((89.5, SMUSSO1_SIZE), (89.5 + SMUSSO1_SIZE, 0), (89.5, 0), align=None)
    smusso1_piece_1 = revolve(axis=Axis((0, 10, 0), (0, -1, 0)), revolution_arc=359.64, mode=Mode.PRIVATE)
    smusso1_piece_1 = smusso1_piece_1 & Plane(origin=(0, 6.636633225, 0), x_dir=(0.17079588700932372, 0, -0.9853064320203632), z_dir=(0, -1, 0)) * Cylinder(97.5, 399, mode=Mode.PRIVATE)
    smusso1_piece_1 = split(smusso1_piece_1, bisect_by=Plane(origin=(35.757086514, 6.636633225, -107.09735814), z_dir=(0.5000000000000053, 0, 0.8660254037844358)), keep=Keep.TOP, mode=Mode.PRIVATE)
    add(smusso1_piece_1, mode=Mode.SUBTRACT)
    with BuildSketch(Plane(origin=(0, 10, 0), x_dir=(0.0031415874858797023, 0, -0.9999950652018582), z_dir=(-0.9999950652018582, 0, -0.0031415874858797023))) as smusso1_piece_2_section:
        Polygon((89.5, SMUSSO1_SIZE), (89.5 + SMUSSO1_SIZE, 0), (89.5, 0), align=None)
    smusso1_piece_2 = revolve(axis=Axis((0, 10, 0), (0, -1, 0)), revolution_arc=359.64, mode=Mode.PRIVATE)
    smusso1_piece_2 = smusso1_piece_2 & Plane(origin=(0, 6.636633226, 0), x_dir=(0.17079588700932372, 0, -0.9853064320203632), z_dir=(0, -1, 0)) * Cylinder(97.5, 399, mode=Mode.PRIVATE)
    smusso1_piece_2 = split(smusso1_piece_2, bisect_by=Plane(origin=(-34.569971333, 6.636633226, -59.64419713), z_dir=(-0.9396926207859074, 0, -0.3420201433256714)), keep=Keep.TOP, mode=Mode.PRIVATE)
    add(smusso1_piece_2, mode=Mode.SUBTRACT)

    # Raccordo1
    raccordo1_edges = [part_1.edges().sort_by_distance(p)[0] for p in [
        (-16.652598983, 90, -96.067377122),
        (16.652598983, 90, -96.067377122),
    ]]
    fillet(raccordo1_edges, radius=RACCORDO1_R)

    # Smusso2
    smusso2_edges = [part_1.edges().sort_by_distance(p)[0] for p in [
        (0, -20, 97.5),
        (0, -20, 89.5),
    ]]
    chamfer(smusso2_edges, length=SMUSSO2_SIZE)


solid = part_1.part
